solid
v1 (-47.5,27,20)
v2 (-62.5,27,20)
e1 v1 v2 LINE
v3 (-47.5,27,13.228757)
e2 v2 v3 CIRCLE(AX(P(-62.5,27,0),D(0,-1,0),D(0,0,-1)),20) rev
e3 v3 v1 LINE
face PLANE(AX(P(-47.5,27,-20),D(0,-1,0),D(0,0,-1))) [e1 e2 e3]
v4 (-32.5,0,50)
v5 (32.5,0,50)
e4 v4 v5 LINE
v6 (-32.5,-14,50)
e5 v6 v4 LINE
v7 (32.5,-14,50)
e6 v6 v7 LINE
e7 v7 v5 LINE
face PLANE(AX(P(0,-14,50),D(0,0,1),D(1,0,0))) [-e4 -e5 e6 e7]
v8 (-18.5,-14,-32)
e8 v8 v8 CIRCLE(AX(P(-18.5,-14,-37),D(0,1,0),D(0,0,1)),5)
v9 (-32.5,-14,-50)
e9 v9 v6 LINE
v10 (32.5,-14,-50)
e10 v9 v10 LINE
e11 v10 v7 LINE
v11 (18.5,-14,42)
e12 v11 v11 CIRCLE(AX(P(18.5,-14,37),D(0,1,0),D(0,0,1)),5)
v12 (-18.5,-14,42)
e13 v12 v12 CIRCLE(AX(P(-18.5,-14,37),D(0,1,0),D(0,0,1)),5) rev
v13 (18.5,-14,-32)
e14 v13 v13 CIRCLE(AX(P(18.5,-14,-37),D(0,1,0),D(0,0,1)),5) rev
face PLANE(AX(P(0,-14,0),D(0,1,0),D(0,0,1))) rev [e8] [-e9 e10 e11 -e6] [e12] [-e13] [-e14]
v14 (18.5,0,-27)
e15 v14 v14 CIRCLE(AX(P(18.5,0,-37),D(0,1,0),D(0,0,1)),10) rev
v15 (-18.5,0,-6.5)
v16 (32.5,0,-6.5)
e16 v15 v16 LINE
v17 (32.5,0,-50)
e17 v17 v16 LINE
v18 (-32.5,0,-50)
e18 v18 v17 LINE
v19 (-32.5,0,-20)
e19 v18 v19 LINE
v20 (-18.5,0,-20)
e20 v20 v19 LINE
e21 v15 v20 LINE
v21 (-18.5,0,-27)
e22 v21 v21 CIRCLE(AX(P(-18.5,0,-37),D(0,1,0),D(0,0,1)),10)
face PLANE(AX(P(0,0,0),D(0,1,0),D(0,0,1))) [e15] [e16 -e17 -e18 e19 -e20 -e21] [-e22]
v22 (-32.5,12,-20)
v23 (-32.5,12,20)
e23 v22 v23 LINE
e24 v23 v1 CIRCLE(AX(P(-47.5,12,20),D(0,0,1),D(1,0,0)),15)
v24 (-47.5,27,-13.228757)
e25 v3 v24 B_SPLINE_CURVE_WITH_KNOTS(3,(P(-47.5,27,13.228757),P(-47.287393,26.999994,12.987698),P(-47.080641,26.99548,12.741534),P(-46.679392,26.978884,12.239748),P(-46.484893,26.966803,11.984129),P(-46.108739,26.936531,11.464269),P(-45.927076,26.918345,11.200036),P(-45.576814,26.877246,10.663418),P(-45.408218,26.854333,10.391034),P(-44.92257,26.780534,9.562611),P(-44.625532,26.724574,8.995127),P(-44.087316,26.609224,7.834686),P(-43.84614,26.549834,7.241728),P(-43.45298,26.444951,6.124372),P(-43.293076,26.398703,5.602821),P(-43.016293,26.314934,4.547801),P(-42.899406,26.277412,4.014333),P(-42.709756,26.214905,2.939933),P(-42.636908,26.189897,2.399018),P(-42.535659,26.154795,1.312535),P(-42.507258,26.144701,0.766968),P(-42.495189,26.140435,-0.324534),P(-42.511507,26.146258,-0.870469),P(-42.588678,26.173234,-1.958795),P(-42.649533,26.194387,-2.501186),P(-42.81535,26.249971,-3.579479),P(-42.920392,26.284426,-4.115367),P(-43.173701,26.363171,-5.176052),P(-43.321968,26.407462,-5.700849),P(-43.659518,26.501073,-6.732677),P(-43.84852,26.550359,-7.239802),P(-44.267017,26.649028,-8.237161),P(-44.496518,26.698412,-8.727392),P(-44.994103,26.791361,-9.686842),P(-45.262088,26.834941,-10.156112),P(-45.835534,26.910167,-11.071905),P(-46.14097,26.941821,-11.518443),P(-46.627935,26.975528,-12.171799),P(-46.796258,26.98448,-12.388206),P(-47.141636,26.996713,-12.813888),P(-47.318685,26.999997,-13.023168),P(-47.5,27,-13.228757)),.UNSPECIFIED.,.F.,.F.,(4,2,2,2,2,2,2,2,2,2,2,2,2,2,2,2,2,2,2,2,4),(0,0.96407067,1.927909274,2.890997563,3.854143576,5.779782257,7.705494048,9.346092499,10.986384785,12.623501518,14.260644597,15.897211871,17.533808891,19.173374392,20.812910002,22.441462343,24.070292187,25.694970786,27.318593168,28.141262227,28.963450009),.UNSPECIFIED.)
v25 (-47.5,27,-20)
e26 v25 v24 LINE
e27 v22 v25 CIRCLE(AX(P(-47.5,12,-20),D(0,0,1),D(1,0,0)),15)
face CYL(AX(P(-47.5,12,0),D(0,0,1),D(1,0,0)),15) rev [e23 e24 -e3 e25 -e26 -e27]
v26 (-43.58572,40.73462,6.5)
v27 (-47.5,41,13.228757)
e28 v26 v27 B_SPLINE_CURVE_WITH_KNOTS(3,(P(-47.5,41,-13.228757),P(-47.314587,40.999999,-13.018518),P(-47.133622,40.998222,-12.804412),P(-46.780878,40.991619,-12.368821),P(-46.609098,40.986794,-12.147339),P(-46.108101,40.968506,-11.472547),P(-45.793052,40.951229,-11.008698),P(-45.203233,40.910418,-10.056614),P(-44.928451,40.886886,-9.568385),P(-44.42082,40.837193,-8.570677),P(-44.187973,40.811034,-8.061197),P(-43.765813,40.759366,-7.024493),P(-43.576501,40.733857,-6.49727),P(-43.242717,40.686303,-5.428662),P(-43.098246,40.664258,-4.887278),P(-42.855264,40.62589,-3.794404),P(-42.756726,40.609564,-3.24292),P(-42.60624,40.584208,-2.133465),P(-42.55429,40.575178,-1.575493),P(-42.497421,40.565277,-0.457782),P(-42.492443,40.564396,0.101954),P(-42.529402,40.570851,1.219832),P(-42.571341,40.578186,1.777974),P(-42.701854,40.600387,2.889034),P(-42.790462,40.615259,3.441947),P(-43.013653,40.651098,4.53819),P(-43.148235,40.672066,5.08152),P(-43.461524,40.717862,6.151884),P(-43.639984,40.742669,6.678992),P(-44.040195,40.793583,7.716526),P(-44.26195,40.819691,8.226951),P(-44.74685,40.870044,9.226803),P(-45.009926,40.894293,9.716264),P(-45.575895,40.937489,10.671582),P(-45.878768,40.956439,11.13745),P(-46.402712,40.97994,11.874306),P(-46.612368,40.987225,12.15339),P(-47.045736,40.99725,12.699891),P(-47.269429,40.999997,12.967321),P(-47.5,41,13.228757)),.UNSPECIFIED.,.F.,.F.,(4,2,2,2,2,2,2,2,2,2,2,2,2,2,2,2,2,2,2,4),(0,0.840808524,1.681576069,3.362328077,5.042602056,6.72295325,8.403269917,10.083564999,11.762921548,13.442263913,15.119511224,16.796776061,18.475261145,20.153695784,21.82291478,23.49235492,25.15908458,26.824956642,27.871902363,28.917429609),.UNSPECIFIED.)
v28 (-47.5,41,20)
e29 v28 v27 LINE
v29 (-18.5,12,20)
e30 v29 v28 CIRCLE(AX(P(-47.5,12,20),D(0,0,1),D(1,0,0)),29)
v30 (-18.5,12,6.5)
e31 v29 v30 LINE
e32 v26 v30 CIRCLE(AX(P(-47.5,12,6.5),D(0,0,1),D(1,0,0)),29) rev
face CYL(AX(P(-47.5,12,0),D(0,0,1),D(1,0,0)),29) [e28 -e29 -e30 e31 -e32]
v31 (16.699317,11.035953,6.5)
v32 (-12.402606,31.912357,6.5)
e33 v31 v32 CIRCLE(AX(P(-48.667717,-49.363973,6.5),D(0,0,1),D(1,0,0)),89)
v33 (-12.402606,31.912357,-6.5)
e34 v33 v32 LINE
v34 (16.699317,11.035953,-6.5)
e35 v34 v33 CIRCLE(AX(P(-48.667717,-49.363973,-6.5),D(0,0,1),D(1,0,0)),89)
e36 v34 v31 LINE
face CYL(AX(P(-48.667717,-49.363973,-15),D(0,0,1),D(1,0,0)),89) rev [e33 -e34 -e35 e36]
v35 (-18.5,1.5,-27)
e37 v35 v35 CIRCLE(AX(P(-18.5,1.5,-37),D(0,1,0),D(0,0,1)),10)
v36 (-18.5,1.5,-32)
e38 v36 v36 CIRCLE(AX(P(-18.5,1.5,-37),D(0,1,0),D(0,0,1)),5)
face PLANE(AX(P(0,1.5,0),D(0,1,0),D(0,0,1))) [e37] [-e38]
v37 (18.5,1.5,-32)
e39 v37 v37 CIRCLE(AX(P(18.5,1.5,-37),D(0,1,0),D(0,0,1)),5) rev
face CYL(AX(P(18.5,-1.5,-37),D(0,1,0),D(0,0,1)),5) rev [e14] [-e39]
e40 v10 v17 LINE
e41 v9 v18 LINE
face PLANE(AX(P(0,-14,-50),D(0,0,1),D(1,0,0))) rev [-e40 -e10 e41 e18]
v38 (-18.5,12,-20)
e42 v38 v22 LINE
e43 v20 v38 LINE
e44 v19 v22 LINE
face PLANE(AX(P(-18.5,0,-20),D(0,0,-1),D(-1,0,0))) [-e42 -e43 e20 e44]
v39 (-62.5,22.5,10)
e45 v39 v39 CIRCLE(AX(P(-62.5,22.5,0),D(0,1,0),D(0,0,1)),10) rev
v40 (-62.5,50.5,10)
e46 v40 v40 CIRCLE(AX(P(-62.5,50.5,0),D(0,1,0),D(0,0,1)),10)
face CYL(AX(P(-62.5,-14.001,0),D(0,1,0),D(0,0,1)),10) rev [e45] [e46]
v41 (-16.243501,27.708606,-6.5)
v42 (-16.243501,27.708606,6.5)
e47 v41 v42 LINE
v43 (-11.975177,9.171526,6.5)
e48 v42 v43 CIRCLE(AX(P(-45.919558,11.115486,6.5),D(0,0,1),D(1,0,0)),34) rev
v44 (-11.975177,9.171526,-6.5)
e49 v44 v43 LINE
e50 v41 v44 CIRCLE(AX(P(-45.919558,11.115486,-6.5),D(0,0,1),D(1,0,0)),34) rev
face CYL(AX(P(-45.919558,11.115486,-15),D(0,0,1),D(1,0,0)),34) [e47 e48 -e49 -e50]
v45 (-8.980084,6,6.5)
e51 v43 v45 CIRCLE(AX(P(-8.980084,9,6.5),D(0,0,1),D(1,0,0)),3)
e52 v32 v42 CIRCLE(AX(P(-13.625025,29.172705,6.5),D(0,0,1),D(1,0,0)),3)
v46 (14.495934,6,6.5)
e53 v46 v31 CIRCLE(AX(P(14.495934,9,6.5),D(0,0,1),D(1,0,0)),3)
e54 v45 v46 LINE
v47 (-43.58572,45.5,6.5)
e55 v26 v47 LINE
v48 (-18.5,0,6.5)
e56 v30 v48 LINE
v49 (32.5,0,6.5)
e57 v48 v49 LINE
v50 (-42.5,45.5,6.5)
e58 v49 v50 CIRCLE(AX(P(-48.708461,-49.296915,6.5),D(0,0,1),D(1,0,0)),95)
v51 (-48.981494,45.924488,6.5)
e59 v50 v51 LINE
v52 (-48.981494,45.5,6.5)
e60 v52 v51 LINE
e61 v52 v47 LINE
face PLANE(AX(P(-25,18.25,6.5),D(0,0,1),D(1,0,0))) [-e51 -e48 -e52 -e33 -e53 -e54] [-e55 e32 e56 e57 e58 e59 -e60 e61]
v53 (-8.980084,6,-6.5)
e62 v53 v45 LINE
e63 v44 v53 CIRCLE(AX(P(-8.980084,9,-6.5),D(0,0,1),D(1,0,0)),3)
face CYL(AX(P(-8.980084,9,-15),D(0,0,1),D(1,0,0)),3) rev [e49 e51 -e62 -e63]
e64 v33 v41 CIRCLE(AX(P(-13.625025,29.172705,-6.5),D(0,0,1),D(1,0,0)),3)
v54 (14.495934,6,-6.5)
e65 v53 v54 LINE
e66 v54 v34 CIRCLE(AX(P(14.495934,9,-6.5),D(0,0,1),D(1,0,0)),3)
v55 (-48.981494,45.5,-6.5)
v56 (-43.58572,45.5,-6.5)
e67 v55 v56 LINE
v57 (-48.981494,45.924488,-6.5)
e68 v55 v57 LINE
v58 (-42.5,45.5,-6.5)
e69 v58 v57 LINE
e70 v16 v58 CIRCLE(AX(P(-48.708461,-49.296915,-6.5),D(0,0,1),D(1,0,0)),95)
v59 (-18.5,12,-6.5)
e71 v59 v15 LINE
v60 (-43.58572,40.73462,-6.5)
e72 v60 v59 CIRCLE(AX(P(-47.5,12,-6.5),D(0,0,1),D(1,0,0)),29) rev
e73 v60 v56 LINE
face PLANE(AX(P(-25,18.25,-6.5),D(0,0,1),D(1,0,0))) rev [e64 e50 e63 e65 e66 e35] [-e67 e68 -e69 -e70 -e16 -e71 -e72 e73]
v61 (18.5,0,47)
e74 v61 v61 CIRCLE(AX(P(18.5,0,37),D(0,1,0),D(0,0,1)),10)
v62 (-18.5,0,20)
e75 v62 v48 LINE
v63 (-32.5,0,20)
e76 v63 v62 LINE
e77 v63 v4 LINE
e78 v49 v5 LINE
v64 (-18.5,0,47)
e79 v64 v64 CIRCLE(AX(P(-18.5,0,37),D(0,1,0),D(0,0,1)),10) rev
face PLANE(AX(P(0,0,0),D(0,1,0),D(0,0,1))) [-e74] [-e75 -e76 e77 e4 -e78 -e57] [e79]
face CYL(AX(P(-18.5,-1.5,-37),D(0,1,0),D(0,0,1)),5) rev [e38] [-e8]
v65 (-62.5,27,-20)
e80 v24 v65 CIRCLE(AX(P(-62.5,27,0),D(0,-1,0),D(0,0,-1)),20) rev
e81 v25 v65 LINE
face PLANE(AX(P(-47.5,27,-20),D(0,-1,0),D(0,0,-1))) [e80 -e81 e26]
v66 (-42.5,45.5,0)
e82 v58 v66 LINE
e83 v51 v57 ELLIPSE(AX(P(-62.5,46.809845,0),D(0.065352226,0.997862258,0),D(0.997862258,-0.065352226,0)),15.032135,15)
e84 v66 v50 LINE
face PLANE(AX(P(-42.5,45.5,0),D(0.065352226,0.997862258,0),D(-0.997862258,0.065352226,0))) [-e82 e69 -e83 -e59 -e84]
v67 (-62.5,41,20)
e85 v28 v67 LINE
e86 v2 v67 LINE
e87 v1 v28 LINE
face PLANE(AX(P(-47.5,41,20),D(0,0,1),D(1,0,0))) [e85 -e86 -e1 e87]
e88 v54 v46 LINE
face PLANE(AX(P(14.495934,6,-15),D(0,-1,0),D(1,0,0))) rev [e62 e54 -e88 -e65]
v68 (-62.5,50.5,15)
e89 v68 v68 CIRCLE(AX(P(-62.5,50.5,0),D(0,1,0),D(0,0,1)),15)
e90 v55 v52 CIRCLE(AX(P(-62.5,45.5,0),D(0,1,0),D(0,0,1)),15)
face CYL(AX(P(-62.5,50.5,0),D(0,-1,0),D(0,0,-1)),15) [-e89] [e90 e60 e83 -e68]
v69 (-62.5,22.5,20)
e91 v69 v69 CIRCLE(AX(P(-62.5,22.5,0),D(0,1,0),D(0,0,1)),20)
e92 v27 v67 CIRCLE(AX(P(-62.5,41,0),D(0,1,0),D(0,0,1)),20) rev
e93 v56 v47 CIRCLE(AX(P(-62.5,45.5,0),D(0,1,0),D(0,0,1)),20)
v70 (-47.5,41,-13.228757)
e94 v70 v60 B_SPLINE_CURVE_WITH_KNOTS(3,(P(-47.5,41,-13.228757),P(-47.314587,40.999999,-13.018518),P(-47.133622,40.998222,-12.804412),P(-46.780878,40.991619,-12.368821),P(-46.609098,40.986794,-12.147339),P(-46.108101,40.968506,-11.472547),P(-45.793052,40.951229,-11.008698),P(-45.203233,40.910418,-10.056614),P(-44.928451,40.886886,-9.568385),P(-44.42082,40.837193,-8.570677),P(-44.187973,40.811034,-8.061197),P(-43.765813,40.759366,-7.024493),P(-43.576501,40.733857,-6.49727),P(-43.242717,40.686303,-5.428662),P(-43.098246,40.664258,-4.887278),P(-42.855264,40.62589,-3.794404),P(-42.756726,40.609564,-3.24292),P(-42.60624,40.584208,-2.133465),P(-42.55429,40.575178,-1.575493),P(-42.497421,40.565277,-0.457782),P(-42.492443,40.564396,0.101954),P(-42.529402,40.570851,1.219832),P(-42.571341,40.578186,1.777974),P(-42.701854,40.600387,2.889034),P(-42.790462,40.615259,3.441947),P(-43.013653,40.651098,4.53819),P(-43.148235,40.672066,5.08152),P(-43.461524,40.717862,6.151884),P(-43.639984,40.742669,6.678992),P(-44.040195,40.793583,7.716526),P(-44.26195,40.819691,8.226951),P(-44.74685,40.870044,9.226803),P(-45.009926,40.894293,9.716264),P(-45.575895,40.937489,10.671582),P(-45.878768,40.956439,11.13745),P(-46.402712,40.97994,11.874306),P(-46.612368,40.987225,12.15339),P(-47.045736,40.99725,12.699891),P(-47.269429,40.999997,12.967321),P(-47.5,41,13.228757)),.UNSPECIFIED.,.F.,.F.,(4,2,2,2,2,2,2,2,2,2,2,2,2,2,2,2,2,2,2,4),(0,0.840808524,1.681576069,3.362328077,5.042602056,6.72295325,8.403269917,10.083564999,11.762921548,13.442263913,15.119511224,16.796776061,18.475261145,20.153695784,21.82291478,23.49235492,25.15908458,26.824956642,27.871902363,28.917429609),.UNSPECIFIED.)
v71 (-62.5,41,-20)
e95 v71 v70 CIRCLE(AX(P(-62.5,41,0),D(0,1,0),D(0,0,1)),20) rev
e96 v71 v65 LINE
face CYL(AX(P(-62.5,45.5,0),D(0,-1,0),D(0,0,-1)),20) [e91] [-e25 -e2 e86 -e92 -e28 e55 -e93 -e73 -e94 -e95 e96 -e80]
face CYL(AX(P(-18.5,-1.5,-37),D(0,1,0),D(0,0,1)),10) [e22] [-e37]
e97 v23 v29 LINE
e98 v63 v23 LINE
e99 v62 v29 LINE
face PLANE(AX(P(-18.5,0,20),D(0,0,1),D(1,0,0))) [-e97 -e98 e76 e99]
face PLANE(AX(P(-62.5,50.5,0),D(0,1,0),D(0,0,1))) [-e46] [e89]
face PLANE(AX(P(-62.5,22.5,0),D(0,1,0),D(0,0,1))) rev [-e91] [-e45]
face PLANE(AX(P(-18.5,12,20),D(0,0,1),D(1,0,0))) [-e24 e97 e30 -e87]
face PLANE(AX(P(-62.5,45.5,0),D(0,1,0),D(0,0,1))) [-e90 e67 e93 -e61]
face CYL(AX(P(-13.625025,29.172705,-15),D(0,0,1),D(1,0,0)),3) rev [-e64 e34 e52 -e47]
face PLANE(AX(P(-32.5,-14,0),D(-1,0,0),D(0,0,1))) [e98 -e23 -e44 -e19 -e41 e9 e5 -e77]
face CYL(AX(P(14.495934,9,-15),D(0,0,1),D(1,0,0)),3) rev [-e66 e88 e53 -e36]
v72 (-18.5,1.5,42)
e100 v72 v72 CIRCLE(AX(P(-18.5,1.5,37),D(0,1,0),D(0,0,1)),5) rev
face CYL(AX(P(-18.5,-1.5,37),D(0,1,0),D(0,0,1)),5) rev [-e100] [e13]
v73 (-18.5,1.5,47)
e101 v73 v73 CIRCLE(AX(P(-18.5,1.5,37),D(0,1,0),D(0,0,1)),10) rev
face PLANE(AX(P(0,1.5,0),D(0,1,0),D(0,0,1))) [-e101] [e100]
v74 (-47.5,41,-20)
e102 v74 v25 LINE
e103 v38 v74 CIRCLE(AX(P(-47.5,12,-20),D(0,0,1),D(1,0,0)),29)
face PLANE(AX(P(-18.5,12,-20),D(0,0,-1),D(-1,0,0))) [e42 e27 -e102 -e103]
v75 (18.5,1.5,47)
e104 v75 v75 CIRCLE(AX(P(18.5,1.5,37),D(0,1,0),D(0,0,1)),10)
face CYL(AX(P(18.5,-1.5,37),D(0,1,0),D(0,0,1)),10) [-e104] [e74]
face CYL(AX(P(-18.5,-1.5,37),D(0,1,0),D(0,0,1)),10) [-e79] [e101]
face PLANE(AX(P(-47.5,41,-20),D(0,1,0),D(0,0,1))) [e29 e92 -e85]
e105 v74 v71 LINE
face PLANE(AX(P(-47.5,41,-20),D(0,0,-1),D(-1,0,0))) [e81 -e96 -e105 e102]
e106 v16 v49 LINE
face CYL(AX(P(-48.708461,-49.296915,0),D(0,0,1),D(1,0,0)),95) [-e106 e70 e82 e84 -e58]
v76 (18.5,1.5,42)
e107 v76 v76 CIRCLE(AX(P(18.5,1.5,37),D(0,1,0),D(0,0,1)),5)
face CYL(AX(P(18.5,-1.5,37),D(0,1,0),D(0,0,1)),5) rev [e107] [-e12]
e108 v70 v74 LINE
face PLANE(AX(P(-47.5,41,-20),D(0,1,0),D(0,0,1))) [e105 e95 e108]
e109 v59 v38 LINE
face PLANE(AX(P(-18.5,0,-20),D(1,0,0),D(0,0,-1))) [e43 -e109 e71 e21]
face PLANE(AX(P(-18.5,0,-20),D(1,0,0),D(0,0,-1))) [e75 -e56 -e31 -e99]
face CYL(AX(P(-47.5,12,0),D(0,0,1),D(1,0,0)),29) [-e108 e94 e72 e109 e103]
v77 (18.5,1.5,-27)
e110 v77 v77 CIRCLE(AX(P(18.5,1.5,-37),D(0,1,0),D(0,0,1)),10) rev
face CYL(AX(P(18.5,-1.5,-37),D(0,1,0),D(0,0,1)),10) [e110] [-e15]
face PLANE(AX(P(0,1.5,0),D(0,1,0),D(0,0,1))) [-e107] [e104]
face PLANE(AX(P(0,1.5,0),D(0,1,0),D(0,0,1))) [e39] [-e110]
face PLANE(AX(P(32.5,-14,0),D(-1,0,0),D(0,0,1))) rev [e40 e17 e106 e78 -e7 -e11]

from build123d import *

# Parameters (mm, degrees)
SKETCH1_W            = 65
SKETCH1_H            = 100
SKETCH1_R            = 10
BOSS_EXTRUDE1_DEPTH  = 14
SKETCH1_4_R          = 10
SKETCH1_4_R_2        = 5
BOSS_EXTRUDE3_DEPTH  = 1.5
SKETCH1_8_R          = 10
SKETCH1_8_R_2        = 5
BOSS_EXTRUDE6_DEPTH  = 14
SKETCH5_W            = 14
SKETCH5_H            = 40
SKETCH8_R            = 20
BOSS_EXTRUDE8_DEPTH  = 11.5
SKETCH11_R           = 15
BOSS_EXTRUDE10_DEPTH = 5
CUT_EXTRUDE1_REACH   = 118.045
SKETCH12_R           = 10
RIB1_START           = -6.5
RIB1_DEPTH           = 13
CUT_EXTRUDE2_DEPTH   = 15


# Read off the part's stored shape, not the designer's step: Rib1
with BuildPart() as part:
    # Sketch1 → Boss-Extrude1 (new body)
    with BuildSketch(Plane(origin=(0, 0, 0), x_dir=(1, 0, 0), z_dir=(0, 1, 0))):
        Rectangle(SKETCH1_W, SKETCH1_H)
        with Locations(Location((-18.5, 37, 0), (0, 0, 270))):
            Circle(SKETCH1_R, mode=Mode.SUBTRACT)
        with Locations(Location((18.5, -37, 0), (0, 0, 270))):
            Circle(SKETCH1_R, mode=Mode.SUBTRACT)
        with Locations(Location((-18.5, -37, 0), (0, 0, 270))):
            Circle(SKETCH1_R, mode=Mode.SUBTRACT)
        with Locations(Location((18.5, 37, 0), (0, 0, 270))):
            Circle(SKETCH1_R, mode=Mode.SUBTRACT)
    extrude(amount=-BOSS_EXTRUDE1_DEPTH)

    # Sketch1<4> → Boss-Extrude3 (add, symmetric)
    # profile 1 of 4: a face of its own
    with BuildSketch(Plane(origin=(0, 0, 0), x_dir=(1, 0, 0), z_dir=(0, 1, 0))):
        with Locations(Location((18.5, -37, 0), (0, 0, 270))):
            Circle(SKETCH1_4_R)
        with Locations(Location((18.5, -37, 0), (0, 0, 270))):
            Circle(SKETCH1_4_R_2, mode=Mode.SUBTRACT)
    # profile 2 of 4: a face of its own
    with BuildSketch(Plane(origin=(0, 0, 0), x_dir=(1, 0, 0), z_dir=(0, 1, 0))):
        with Locations(Location((-18.5, -37, 0), (0, 0, 270))):
            Circle(SKETCH1_4_R)
        with Locations(Location((-18.5, -37, 0), (0, 0, 270))):
            Circle(SKETCH1_4_R_2, mode=Mode.SUBTRACT)
    # profile 3 of 4: a face of its own
    with BuildSketch(Plane(origin=(0, 0, 0), x_dir=(1, 0, 0), z_dir=(0, 1, 0))):
        with Locations(Location((-18.5, 37, 0), (0, 0, 270))):
            Circle(SKETCH1_4_R)
        with Locations(Location((-18.5, 37, 0), (0, 0, 270))):
            Circle(SKETCH1_4_R_2, mode=Mode.SUBTRACT)
    # profile 4 of 4: a face of its own
    with BuildSketch(Plane(origin=(0, 0, 0), x_dir=(1, 0, 0), z_dir=(0, 1, 0))):
        with Locations(Location((18.5, 37, 0), (0, 0, 270))):
            Circle(SKETCH1_4_R)
        with Locations(Location((18.5, 37, 0), (0, 0, 270))):
            Circle(SKETCH1_4_R_2, mode=Mode.SUBTRACT)
    extrude(amount=BOSS_EXTRUDE3_DEPTH, both=True)

    # Sketch1<8> → Boss-Extrude6 (add)
    # profile 1 of 4: a face of its own
    with BuildSketch(Plane(origin=(0, 0, 0), x_dir=(1, 0, 0), z_dir=(0, 1, 0))):
        with Locations(Location((18.5, -37, 0), (0, 0, 270))):
            Circle(SKETCH1_8_R)
        with Locations(Location((18.5, -37, 0), (0, 0, 270))):
            Circle(SKETCH1_8_R_2, mode=Mode.SUBTRACT)
    # profile 2 of 4: a face of its own
    with BuildSketch(Plane(origin=(0, 0, 0), x_dir=(1, 0, 0), z_dir=(0, 1, 0))):
        with Locations(Location((-18.5, -37, 0), (0, 0, 270))):
            Circle(SKETCH1_8_R)
        with Locations(Location((-18.5, -37, 0), (0, 0, 270))):
            Circle(SKETCH1_8_R_2, mode=Mode.SUBTRACT)
    # profile 3 of 4: a face of its own
    with BuildSketch(Plane(origin=(0, 0, 0), x_dir=(1, 0, 0), z_dir=(0, 1, 0))):
        with Locations(Location((-18.5, 37, 0), (0, 0, 270))):
            Circle(SKETCH1_8_R)
        with Locations(Location((-18.5, 37, 0), (0, 0, 270))):
            Circle(SKETCH1_8_R_2, mode=Mode.SUBTRACT)
    # profile 4 of 4: a face of its own
    with BuildSketch(Plane(origin=(0, 0, 0), x_dir=(1, 0, 0), z_dir=(0, 1, 0))):
        with Locations(Location((18.5, 37, 0), (0, 0, 270))):
            Circle(SKETCH1_8_R)
        with Locations(Location((18.5, 37, 0), (0, 0, 270))):
            Circle(SKETCH1_8_R_2, mode=Mode.SUBTRACT)
    extrude(amount=-BOSS_EXTRUDE6_DEPTH)

    # Sweep1: sweep along a path in Sketch6
    with BuildLine(Plane.XY) as sweep1_path:
        Line((-32.5, 0), (-32.5, 12))
        ThreePointArc((-32.5, 12), (-36.893398282, 22.606601718), (-47.5, 27))
        Line((-47.5, 27), (-62.5, 27))
    # Sketch5 → Sweep1 (sweep)
    with BuildSketch(Plane(origin=(0, 0, 0), x_dir=(1, 0, 0), z_dir=(0, 1, 0))):
        with Locations((-25.5, 0)):
            Rectangle(SKETCH5_W, SKETCH5_H)
    sweep(path=sweep1_path.line)

    # Sketch8 → Boss-Extrude8 (add, symmetric)
    with BuildSketch(Plane(origin=(0, 34, 0), x_dir=(1, 0, 0), z_dir=(0, 1, 0))):
        with Locations(Location((-62.5, 0, 0), (0, 0, 270))):
            Circle(SKETCH8_R)
    extrude(amount=BOSS_EXTRUDE8_DEPTH, both=True)

    # Sketch11 → Boss-Extrude10 (add)
    with BuildSketch(Plane(origin=(0, 45.5, 0), x_dir=(1, 0, 0), z_dir=(0, 1, 0))):
        with Locations(Location((-62.5, 0, 0), (0, 0, 270))):
            Circle(SKETCH11_R)
    extrude(amount=BOSS_EXTRUDE10_DEPTH)

    # Sketch12 → Cut-Extrude1 (cut, up to next)
    with BuildSketch(Plane(origin=(0, 50.5, 0), x_dir=(1, 0, 0), z_dir=(0, 1, 0)), mode=Mode.PRIVATE) as cut_extrude1_sk1:
        with Locations(Location((-62.5, 0, 0), (0, 0, 270))):
            Circle(SKETCH12_R)
    cut_extrude1_tool1 = extrude(cut_extrude1_sk1.sketch, amount=-CUT_EXTRUDE1_REACH, mode=Mode.PRIVATE) & part.part
    add(cut_extrude1_tool1.solids().sort_by_distance((-62.5, 50.5, 0))[0], mode=Mode.SUBTRACT)

    # Rib1 outline → Rib1 (add)
    with BuildSketch(Plane.XY.offset(RIB1_START)):
        with BuildLine():
            Line((-50, 45.991191737), (-50, 41))
            Line((-50, 41), (-47.5, 41))
            ThreePointArc((-47.5, 41), (-26.993903346, 32.506096654), (-18.5, 12))
            Line((-18.5, 12), (-18.5, 0))
            Line((-18.5, 0), (32.5, 0))
            ThreePointArc((32.5, 0), (0.566198386, 31.925052284), (-42.5, 45.5))
            Line((-42.5, 45.5), (-48.981494165, 45.924487517))
            Line((-48.981494165, 45.924487517), (-50, 45.991191737))
        make_face()
    extrude(amount=RIB1_DEPTH)

    # Sketch14 → Cut-Extrude2 (cut, symmetric)
    with BuildSketch(Plane.XY):
        with BuildLine():
            Line((14.495933603, 6), (-8.980084126, 6))
            ThreePointArc((-8.980084126, 6), (-11.161205142, 6.940215761), (-11.975176588, 9.171525926))
            ThreePointArc((-11.975176588, 9.171525926), (-12.786554884, 18.744648632), (-16.243500658, 27.708606407))
            ThreePointArc((-16.243500658, 27.708606407), (-15.839776142, 31.196285594), (-12.402605555, 31.912356784))
            ThreePointArc((-12.402605555, 31.912356784), (3.209342465, 22.95318127), (16.699316747, 11.035952535))
            ThreePointArc((16.699316747, 11.035952535), (17.244374762, 7.797472995), (14.495933603, 6))
        make_face()
    extrude(amount=CUT_EXTRUDE2_DEPTH, both=True, mode=Mode.SUBTRACT)


solid = part.part
